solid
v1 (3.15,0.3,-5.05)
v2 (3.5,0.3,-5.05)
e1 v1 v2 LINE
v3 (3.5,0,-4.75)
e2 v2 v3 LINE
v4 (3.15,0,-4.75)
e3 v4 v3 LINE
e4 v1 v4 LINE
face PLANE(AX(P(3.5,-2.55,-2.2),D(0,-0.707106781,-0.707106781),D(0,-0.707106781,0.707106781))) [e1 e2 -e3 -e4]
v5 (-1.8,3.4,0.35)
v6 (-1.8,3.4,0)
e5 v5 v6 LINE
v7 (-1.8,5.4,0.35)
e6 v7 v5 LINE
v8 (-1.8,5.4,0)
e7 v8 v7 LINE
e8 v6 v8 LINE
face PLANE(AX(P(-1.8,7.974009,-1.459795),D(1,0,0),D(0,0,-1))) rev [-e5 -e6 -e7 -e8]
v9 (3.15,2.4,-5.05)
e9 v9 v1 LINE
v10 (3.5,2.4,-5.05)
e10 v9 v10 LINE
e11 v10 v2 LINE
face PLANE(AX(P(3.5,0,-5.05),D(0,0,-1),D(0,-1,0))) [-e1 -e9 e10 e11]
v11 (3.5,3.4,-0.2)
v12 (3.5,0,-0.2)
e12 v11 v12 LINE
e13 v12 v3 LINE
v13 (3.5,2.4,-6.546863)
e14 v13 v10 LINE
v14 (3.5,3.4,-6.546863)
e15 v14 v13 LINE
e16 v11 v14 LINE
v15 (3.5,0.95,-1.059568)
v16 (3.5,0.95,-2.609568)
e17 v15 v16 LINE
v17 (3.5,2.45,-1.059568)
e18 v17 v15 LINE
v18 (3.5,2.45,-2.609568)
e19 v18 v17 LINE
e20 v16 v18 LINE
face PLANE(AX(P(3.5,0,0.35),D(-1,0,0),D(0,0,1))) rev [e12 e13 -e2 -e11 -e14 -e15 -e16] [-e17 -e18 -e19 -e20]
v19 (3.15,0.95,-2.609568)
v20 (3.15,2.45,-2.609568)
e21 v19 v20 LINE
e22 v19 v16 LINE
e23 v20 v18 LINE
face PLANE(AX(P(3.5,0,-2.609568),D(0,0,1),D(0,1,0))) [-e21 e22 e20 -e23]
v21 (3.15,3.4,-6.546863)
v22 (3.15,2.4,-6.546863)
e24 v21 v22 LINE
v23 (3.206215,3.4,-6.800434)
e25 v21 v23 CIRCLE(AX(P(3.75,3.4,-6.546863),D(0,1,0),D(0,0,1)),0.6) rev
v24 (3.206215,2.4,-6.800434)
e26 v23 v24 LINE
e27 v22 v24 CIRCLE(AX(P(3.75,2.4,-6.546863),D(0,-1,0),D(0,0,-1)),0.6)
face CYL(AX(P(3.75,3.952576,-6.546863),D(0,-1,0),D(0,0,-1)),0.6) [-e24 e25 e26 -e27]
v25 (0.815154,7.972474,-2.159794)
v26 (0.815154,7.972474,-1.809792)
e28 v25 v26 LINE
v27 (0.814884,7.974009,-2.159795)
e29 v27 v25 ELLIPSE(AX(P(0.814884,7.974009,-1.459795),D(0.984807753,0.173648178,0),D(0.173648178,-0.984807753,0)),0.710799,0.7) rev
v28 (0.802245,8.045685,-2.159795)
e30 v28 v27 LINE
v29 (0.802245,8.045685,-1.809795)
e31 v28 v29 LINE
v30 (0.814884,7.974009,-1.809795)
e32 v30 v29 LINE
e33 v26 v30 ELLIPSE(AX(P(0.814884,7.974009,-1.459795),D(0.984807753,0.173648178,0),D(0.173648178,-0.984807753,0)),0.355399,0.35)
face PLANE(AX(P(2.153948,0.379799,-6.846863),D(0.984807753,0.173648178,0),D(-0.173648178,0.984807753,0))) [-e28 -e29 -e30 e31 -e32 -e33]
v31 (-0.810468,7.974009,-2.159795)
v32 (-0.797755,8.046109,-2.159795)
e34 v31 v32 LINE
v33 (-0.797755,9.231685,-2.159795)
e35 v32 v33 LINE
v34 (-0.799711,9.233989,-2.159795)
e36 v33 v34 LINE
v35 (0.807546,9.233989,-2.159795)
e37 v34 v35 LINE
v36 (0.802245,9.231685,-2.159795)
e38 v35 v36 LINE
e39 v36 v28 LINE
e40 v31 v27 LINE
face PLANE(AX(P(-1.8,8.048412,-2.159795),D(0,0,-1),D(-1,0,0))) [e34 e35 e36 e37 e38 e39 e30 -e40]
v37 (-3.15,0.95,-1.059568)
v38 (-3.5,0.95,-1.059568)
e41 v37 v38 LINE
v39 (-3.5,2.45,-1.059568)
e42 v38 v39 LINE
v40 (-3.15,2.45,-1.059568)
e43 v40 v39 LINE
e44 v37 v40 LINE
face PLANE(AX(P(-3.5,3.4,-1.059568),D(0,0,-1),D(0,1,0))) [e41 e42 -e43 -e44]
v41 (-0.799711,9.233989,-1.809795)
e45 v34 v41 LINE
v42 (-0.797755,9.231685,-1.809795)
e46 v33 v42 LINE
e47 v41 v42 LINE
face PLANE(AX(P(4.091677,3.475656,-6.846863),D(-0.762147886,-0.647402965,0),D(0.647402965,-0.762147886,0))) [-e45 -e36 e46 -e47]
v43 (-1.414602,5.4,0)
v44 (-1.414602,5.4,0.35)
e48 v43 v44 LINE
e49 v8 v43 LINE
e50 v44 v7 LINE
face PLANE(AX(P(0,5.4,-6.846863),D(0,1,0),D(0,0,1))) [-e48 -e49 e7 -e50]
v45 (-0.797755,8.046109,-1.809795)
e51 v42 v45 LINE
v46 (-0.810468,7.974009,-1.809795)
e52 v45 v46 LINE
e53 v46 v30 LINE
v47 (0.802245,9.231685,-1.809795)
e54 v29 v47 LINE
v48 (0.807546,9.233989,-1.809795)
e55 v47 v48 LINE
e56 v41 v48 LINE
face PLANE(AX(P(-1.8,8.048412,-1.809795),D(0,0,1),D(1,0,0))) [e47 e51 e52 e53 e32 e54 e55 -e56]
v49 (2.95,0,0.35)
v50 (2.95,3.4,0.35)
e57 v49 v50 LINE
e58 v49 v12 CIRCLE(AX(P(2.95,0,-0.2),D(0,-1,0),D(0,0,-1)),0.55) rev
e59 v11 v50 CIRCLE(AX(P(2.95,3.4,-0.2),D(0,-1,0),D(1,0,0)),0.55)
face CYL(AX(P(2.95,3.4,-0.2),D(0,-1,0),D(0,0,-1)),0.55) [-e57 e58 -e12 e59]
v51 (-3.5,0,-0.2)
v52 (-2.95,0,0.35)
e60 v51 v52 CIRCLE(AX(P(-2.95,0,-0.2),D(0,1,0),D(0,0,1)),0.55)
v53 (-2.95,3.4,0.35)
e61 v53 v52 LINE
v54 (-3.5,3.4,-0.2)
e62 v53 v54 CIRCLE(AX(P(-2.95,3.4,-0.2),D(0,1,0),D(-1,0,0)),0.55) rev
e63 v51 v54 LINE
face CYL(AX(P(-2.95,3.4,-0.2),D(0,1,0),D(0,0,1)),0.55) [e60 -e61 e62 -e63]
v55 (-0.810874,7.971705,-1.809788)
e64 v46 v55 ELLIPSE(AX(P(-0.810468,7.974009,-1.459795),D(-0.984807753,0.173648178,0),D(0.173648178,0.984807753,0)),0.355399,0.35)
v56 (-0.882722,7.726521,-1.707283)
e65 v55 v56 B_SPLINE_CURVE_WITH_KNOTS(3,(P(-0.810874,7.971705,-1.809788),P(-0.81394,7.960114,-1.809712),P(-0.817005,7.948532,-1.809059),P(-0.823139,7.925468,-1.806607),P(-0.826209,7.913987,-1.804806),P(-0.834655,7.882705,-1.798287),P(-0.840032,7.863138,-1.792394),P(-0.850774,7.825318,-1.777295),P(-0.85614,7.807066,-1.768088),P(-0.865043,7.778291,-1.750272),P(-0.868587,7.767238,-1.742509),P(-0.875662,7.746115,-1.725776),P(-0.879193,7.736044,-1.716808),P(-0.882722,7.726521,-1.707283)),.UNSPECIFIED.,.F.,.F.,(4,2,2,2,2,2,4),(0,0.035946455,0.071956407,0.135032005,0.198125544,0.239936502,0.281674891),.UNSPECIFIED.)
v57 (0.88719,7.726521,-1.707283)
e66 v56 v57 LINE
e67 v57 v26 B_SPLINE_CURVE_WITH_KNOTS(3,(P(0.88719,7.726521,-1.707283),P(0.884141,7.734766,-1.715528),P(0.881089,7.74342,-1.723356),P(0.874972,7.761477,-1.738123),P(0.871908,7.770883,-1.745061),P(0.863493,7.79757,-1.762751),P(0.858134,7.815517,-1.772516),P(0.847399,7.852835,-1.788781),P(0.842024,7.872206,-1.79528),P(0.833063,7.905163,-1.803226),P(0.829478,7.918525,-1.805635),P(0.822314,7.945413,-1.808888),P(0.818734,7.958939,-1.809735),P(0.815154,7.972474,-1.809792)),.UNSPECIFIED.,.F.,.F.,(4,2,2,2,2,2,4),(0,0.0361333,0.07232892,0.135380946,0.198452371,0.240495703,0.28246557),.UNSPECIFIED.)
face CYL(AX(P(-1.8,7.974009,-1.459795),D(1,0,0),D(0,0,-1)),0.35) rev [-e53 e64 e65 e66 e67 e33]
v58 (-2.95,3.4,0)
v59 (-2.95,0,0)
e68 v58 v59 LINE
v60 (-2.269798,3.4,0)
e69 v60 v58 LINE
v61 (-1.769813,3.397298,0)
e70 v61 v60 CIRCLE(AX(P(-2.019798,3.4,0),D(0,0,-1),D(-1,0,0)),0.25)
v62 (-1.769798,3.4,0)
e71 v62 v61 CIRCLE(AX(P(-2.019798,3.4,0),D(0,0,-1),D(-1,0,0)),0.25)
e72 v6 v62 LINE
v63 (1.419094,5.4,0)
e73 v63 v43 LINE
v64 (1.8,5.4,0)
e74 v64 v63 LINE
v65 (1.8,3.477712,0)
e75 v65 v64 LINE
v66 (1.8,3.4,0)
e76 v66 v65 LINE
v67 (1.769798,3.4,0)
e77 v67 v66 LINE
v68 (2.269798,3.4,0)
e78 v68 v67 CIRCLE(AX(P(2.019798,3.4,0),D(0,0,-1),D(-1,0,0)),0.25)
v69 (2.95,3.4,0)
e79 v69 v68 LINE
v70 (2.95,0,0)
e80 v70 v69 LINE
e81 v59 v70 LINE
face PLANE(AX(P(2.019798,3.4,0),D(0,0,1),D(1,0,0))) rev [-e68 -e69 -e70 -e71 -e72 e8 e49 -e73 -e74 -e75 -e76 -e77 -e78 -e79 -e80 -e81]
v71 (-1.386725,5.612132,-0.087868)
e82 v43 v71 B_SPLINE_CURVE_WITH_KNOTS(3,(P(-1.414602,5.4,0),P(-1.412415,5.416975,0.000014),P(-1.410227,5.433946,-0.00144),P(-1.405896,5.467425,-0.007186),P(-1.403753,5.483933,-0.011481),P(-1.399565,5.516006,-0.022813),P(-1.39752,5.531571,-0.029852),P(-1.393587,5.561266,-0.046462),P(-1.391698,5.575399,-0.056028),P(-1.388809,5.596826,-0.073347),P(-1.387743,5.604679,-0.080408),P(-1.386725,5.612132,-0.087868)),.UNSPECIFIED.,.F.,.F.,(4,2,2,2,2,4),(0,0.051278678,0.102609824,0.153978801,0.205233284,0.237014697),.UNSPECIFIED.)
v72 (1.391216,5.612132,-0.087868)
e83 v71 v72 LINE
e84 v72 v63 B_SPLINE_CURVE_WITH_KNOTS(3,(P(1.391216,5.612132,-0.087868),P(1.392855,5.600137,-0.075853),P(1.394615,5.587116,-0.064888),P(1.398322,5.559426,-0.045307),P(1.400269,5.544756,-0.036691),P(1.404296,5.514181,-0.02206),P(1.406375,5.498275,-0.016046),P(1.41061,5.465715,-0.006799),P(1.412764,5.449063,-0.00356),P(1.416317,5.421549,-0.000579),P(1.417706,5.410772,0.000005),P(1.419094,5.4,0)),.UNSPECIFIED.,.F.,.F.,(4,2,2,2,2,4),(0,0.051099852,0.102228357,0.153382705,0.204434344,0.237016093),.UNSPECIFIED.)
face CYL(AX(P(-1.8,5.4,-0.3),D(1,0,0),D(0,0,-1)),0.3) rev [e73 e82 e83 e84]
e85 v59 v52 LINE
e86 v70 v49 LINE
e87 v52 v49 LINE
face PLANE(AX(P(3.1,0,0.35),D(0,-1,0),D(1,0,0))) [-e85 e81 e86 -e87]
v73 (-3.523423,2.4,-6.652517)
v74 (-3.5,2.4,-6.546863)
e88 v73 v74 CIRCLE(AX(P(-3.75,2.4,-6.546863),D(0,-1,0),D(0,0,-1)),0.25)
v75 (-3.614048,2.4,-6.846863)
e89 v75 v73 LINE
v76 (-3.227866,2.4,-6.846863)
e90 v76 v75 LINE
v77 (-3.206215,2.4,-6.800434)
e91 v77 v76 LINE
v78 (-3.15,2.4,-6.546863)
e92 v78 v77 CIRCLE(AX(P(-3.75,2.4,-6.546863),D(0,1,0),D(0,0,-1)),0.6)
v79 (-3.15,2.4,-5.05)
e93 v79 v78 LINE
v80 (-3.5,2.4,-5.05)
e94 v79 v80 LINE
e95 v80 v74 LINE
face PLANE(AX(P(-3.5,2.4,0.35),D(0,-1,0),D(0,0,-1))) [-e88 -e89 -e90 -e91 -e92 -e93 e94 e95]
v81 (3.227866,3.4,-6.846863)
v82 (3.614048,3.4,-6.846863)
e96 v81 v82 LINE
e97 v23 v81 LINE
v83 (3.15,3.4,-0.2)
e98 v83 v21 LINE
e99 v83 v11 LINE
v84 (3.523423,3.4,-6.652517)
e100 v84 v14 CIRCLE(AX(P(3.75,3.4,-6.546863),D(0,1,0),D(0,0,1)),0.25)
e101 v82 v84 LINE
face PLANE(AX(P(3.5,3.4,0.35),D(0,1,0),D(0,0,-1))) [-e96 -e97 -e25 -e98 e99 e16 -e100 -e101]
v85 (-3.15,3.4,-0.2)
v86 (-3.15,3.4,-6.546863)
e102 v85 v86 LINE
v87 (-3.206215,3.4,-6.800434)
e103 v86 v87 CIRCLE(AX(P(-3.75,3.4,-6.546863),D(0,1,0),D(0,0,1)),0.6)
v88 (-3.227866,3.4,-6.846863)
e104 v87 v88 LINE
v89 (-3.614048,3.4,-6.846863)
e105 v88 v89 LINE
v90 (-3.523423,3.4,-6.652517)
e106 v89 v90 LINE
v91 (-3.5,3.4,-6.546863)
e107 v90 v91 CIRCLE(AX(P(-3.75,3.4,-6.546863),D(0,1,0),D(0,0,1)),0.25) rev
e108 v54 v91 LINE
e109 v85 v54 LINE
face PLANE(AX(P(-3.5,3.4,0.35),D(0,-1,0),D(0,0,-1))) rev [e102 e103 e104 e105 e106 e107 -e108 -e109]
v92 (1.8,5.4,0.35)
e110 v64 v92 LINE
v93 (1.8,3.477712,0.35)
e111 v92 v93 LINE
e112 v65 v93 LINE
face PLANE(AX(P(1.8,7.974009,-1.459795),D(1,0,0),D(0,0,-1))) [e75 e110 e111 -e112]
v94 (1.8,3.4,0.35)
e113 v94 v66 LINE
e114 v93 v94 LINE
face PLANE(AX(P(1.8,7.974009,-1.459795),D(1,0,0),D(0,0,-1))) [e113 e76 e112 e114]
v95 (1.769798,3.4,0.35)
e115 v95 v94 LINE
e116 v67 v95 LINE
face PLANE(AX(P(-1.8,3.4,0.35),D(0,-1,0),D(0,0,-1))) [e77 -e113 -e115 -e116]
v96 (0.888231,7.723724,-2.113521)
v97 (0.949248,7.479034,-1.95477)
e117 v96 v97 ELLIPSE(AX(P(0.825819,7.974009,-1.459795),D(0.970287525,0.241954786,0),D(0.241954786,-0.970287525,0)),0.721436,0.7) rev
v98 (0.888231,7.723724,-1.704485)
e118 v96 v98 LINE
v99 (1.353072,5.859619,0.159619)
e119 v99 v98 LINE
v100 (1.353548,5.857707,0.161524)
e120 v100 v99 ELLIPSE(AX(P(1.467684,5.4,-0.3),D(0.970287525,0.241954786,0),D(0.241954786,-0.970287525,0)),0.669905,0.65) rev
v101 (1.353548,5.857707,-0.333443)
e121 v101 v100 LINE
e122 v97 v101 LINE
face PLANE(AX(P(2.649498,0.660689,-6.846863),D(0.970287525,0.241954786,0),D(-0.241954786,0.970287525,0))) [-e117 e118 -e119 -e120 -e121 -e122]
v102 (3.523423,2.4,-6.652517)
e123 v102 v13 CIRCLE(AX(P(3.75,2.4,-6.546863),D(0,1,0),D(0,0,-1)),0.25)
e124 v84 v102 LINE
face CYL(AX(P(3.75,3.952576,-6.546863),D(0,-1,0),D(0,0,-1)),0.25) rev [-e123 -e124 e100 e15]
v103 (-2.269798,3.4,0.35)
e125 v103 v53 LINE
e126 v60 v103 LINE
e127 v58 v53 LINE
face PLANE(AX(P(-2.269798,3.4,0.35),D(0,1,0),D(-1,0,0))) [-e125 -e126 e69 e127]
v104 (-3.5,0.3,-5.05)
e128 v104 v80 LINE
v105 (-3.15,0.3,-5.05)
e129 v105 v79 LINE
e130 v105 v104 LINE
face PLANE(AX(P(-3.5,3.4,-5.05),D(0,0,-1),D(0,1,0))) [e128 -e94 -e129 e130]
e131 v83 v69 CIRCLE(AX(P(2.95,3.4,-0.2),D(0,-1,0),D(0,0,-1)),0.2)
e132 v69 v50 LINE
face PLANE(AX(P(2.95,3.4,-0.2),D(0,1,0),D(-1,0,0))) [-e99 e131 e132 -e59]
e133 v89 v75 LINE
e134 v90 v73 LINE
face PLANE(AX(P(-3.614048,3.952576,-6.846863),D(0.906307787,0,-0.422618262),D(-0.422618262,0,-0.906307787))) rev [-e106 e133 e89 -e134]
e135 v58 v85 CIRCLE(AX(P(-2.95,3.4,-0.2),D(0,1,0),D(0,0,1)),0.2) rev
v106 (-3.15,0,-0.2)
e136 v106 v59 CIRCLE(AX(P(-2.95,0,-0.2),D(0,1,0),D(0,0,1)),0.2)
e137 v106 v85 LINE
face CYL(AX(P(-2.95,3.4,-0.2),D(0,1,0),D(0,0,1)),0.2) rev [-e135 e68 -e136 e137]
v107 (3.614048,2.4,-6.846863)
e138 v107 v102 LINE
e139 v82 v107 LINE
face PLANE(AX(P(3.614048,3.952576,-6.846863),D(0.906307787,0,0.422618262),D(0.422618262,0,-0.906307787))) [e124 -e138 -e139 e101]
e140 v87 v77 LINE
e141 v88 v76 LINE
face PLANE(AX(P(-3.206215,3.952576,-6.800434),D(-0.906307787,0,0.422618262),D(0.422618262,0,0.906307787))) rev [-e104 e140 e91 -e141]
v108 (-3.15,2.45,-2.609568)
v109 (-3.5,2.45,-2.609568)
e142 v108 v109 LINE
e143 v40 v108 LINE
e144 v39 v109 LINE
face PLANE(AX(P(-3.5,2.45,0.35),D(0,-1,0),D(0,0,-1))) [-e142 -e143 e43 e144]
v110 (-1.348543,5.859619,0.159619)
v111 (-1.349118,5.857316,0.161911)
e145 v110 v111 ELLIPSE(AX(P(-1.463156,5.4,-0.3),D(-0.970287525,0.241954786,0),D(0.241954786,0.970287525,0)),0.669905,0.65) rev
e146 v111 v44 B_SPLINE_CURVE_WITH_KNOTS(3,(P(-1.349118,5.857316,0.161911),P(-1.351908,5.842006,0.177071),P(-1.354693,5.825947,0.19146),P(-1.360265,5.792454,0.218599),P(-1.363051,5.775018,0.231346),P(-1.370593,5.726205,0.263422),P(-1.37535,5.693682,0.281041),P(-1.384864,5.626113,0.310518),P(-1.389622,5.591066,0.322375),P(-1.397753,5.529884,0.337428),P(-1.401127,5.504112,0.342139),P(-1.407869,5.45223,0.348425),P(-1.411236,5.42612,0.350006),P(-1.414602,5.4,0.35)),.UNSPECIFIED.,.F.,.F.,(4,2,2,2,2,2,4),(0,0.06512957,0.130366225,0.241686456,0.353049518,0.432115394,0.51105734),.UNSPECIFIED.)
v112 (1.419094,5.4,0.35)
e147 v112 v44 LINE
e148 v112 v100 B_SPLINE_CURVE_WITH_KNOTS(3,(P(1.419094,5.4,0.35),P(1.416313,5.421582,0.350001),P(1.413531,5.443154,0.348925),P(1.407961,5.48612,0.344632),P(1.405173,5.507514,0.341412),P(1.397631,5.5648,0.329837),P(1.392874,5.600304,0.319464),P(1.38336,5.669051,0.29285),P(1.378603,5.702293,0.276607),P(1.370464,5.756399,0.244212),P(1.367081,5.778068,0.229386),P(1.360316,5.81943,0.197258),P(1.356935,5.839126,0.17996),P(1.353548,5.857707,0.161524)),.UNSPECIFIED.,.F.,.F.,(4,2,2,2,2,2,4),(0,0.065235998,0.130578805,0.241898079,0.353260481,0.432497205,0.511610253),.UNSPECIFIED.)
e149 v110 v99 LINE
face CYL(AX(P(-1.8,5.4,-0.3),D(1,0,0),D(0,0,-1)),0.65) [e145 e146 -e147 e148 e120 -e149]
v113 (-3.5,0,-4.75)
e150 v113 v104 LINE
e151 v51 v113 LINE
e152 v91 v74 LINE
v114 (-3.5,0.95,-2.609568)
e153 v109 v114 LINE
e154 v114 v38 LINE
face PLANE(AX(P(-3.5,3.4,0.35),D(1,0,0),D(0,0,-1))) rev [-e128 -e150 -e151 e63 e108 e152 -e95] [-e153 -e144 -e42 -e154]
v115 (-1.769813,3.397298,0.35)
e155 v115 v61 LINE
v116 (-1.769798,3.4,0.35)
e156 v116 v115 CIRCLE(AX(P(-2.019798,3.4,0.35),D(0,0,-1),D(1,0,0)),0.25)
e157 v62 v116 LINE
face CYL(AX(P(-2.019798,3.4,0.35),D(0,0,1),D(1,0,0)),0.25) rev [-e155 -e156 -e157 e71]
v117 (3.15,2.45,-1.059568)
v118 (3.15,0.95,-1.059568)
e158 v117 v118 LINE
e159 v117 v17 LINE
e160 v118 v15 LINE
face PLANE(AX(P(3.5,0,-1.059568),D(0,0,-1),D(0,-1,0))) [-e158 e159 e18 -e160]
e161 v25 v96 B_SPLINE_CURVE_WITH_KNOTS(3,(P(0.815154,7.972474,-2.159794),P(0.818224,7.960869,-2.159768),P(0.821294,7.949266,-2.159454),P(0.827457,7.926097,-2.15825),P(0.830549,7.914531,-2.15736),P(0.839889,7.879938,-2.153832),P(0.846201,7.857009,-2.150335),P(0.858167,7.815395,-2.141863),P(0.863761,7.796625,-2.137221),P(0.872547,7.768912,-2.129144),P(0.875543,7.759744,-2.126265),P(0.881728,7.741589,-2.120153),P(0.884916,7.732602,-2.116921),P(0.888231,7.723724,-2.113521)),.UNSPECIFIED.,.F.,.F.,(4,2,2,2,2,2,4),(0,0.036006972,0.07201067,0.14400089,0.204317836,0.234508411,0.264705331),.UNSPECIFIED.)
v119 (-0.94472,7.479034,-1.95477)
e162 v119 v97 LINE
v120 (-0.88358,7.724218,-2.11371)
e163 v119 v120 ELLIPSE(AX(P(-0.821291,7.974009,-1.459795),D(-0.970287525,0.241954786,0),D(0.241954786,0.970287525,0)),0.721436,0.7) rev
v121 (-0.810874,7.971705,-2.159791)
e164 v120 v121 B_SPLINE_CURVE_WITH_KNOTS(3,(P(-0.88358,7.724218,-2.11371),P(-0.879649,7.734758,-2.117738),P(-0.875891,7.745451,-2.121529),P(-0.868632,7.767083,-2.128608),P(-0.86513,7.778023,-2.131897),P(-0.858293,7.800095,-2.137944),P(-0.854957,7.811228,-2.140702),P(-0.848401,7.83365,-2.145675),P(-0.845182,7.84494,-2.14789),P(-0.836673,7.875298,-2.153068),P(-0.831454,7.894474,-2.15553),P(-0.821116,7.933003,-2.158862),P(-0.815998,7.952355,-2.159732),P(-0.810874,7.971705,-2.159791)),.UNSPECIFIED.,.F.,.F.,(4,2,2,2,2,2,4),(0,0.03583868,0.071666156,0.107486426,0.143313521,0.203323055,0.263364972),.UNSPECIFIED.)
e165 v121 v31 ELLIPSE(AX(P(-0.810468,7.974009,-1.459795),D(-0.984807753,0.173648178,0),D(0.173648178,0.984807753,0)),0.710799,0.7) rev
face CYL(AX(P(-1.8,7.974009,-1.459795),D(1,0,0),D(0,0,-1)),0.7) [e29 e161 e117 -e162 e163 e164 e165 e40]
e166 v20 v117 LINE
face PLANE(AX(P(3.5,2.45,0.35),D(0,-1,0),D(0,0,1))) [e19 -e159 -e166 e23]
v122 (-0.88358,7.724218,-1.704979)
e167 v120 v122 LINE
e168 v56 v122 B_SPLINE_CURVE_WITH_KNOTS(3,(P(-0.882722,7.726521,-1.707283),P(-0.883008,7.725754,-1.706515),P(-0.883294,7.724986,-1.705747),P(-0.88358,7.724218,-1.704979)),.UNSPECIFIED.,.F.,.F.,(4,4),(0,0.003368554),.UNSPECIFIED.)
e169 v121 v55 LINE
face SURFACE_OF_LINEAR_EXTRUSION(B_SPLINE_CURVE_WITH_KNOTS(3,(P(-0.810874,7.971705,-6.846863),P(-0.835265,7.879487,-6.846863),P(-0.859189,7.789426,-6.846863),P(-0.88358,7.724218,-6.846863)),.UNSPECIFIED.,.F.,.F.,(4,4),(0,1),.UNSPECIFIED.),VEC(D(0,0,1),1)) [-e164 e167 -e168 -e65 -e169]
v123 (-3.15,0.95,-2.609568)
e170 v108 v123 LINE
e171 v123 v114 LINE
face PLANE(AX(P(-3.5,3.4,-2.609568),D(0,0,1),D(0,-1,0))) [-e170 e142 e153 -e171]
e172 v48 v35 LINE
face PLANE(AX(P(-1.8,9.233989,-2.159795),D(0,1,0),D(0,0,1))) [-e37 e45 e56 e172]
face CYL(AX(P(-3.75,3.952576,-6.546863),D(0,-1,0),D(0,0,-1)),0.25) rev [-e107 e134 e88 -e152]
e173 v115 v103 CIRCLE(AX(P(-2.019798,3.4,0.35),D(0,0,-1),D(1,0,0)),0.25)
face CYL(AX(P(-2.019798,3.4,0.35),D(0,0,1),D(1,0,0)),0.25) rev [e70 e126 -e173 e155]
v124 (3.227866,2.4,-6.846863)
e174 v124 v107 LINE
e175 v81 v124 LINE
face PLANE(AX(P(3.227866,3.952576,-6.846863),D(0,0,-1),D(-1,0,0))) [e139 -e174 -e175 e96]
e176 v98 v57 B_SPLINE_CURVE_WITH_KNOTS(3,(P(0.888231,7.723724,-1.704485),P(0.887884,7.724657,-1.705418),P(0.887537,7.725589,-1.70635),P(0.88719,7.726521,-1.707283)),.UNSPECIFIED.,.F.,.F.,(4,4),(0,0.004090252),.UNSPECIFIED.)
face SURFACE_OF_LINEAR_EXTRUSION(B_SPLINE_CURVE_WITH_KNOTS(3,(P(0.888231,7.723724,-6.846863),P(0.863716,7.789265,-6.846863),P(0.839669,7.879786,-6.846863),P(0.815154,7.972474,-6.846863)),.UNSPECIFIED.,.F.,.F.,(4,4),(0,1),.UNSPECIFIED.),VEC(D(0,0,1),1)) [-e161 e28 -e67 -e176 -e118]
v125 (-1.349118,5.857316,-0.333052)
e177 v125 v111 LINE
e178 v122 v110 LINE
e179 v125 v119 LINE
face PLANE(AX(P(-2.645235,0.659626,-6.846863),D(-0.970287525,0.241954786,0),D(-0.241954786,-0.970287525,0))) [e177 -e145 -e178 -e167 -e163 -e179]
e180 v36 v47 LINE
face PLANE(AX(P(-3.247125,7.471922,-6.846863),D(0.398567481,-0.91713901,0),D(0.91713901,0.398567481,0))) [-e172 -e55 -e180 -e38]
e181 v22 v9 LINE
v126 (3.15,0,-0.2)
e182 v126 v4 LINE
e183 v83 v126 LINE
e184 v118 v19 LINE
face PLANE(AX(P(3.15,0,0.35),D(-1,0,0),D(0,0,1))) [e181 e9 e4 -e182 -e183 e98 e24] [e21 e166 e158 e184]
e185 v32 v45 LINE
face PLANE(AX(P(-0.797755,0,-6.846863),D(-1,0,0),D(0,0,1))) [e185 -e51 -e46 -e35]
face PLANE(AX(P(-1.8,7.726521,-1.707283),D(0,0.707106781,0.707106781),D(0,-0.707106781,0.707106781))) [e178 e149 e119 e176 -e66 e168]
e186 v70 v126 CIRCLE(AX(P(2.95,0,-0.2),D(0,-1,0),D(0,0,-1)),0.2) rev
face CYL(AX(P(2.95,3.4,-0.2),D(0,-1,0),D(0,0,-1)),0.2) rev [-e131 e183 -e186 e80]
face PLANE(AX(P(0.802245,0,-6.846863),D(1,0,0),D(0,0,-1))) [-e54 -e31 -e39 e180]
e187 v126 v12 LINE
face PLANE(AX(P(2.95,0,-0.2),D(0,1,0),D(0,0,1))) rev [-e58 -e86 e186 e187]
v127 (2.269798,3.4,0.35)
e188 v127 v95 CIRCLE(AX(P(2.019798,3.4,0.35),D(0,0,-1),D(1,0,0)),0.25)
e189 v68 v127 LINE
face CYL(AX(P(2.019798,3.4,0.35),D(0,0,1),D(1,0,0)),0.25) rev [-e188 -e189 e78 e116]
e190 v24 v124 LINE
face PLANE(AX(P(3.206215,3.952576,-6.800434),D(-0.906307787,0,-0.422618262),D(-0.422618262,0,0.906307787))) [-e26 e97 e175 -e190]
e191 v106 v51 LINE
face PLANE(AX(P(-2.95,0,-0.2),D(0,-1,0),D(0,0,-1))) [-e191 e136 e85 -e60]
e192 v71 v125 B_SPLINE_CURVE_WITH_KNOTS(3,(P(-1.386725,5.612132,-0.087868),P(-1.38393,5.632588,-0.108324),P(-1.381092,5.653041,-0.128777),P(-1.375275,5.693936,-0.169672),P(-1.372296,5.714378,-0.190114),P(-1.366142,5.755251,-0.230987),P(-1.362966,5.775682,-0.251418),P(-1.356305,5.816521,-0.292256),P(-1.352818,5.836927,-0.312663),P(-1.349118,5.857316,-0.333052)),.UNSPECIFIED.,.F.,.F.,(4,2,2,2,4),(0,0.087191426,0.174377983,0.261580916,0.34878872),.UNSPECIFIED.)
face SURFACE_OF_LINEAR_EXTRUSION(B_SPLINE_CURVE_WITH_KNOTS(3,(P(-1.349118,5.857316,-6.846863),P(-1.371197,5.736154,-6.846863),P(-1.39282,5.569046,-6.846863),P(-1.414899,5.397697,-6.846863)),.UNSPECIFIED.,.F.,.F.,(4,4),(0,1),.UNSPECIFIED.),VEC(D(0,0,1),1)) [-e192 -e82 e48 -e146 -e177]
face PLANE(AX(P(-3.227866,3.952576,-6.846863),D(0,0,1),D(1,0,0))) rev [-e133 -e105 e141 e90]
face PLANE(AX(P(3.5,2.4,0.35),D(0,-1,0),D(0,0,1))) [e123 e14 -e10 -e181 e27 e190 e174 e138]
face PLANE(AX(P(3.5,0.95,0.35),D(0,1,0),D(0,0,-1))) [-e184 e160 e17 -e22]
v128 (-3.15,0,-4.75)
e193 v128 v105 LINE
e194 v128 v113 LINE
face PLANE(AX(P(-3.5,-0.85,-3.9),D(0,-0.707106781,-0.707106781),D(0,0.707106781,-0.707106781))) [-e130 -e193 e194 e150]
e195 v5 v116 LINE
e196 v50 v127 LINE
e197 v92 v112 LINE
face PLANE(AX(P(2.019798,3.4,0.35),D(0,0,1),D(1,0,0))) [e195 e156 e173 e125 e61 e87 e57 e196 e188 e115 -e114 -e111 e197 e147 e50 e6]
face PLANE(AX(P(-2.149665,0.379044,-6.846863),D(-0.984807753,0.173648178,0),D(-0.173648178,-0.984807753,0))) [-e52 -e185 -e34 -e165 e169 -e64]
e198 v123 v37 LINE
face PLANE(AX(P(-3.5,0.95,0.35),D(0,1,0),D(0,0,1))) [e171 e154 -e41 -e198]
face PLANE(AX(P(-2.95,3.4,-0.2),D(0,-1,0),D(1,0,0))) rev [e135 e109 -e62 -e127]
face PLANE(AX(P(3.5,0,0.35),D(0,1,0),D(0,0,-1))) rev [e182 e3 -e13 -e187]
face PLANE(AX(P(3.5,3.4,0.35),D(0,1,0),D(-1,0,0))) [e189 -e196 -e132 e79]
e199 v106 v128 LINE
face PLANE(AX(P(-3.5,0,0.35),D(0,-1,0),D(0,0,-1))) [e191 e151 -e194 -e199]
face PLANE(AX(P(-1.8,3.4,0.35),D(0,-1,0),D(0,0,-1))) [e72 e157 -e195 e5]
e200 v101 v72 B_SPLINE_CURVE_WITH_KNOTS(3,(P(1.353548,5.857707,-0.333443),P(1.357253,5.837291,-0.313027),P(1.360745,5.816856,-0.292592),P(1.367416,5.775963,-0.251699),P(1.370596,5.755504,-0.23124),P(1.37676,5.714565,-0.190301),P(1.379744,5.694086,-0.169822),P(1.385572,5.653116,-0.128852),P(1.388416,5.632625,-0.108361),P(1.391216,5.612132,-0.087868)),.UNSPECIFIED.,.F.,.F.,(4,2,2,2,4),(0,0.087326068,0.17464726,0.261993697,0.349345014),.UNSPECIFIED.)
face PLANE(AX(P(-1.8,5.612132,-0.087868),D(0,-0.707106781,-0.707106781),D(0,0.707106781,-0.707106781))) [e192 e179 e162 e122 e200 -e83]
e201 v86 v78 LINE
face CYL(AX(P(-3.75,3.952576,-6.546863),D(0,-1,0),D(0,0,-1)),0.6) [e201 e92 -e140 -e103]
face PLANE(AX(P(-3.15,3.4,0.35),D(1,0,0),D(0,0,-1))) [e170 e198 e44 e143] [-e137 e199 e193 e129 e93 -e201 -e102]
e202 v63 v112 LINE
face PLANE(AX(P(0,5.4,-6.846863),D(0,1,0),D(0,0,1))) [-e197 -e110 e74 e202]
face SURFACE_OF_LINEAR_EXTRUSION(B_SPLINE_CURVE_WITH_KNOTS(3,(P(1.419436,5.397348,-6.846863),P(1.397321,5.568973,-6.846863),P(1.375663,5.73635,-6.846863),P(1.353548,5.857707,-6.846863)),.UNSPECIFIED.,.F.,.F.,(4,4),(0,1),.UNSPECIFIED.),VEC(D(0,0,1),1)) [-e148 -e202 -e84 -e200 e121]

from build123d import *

# Parameters (mm, degrees)
DODANIE_WYCI_GNI_CIE1_DEPTH     = 0.35
DODANIE_WYCI_GNI_CIE2_DEPTH     = 3.4
WYTNIJ_WYCI_GNI_CIE1_DEPTH      = 12.253852902
WYTNIJ_WYCI_GNI_CIE1_DEPTH_BACK = 12.253852902
SZKIC3_W                        = 1.55
SZKIC3_H                        = 1.5
KONWERTUJ_BRY_1_DEPTH           = 3.4
KONWERTUJ_BRY_1_2_DEPTH         = 3.4
DODANIE_WYCI_GNI_CIE3_DEPTH     = 1
DODANIE_WYCI_GNI_CIE4_START     = -1.7
DODANIE_WYCI_GNI_CIE4_DEPTH     = 3.6
WYTNIJ_WYCI_GNI_CIE2_DEPTH      = 13.252457687


# Read off the part's stored shape, not the designer's step: Konwertuj bryłę1
with BuildPart() as part:
    # Szkic1 → Dodanie-wyciągnięcie1 (new body)
    with BuildSketch(Plane.XY):
        with BuildLine():
            Line((3.5, 0), (3.5, 3.4))
            Line((3.5, 3.4), (3.1, 3.4))
            Line((3.1, 3.4), (2.269798394, 3.4))
            ThreePointArc((2.269798394, 3.4), (2.019798394, 3.15), (1.769798394, 3.4))
            Line((1.769798394, 3.4), (1.417144432, 5.4))
            Line((1.417144432, 5.4), (-1.417144432, 5.4))
            Line((-1.417144432, 5.4), (-1.769798394, 3.4))
            ThreePointArc((-1.769798394, 3.4), (-2.019798394, 3.15), (-2.269798394, 3.4))
            Line((-2.269798394, 3.4), (-3.1, 3.4))
            Line((-3.1, 3.4), (-3.5, 3.4))
            Line((-3.5, 3.4), (-3.5, 0))
            Line((-3.5, 0), (-3.1, 0))
            Line((-3.1, 0), (3.1, 0))
            Line((3.1, 0), (3.5, 0))
        make_face()
    extrude(amount=DODANIE_WYCI_GNI_CIE1_DEPTH)

    # Szkic2 → Dodanie-wyciągnięcie2 (add)
    with BuildSketch(Plane.XZ):
        with BuildLine():
            Line((3.15, -5.046862694), (3.15, -6.546862697))
            ThreePointArc((3.15, -6.546862697), (3.164222396, -6.676726465), (3.206215328, -6.800433654))
            Line((3.206215328, -6.800433654), (3.227865546, -6.846862697))
            Line((3.227865546, -6.846862697), (3.614047818, -6.846862697))
            Line((3.614047818, -6.846862697), (3.523423053, -6.652517262))
            ThreePointArc((3.523423053, -6.652517262), (3.505925998, -6.6009726), (3.5, -6.546862697))
            Line((3.5, -6.546862697), (3.5, -5.046862694))
            Line((3.5, -5.046862694), (3.5, -4.746862694))
            Line((3.5, -4.746862694), (3.5, -0.046862697))
            Line((3.5, -0.046862697), (3.5, 0))
            Line((3.5, 0), (3.15, 0))
            Line((3.15, 0), (3.15, -0.046862697))
            Line((3.15, -0.046862697), (3.15, -4.746862694))
            Line((3.15, -4.746862694), (3.15, -5.046862694))
        make_face()
    dodanie_wyci_gni_cie2 = extrude(amount=-DODANIE_WYCI_GNI_CIE2_DEPTH)

    # Lustro1: Dodanie-wyciągnięcie2 across plane
    add(dodanie_wyci_gni_cie2.mirror(Plane(origin=(0, 0, 0), x_dir=(0, 0, 1), z_dir=(1, 0, 0))))

    # Szkic3 → Wytnij-wyciągnięcie1 (cut, two sides: drawn at the far end of the back side and taken through both)
    with BuildSketch(Plane(origin=(3.5, 0, 0), x_dir=(0, 0, -1), z_dir=(1, 0, 0)).offset(-WYTNIJ_WYCI_GNI_CIE1_DEPTH_BACK)):
        with Locations((1.834568124, 1.7)):
            Rectangle(SZKIC3_W, SZKIC3_H)
        Polygon((6.85, 2.4), (6.655654565, 2.4), (6.55, 2.4), (6.546862697, 2.4), (6.546862697, 0), (4.749999997, 0), (4.618517663, -2.046100673), (8.285753876, -1.25448224), align=None)
        Polygon((6.546862697, 0), (6.546862697, 2.4), (5.049999997, 2.4), (5.049999997, 0.3), (4.749999997, 0), align=None)
    extrude(amount=WYTNIJ_WYCI_GNI_CIE1_DEPTH + WYTNIJ_WYCI_GNI_CIE1_DEPTH_BACK, mode=Mode.SUBTRACT)

    # Konwertuj bryłę1 outline → Konwertuj bryłę1 (cut)
    with BuildSketch(Plane(origin=(0, 0, 0), x_dir=(1, 0, 0), z_dir=(0, 1, 0))):
        with BuildLine():
            Line((3.15, 6.546862697), (3.5, 6.546862697))
            ThreePointArc((3.5, 6.546862697), (3.505925998, 6.6009726), (3.523423053, 6.652517262))
            Line((3.523423053, 6.652517262), (3.614047818, 6.846862697))
            Line((3.614047818, 6.846862697), (3.227865546, 6.846862697))
            Line((3.227865546, 6.846862697), (3.206215328, 6.800433654))
            ThreePointArc((3.206215328, 6.800433654), (3.164222396, 6.676726465), (3.15, 6.546862697))
        make_face()
        with BuildLine():
            Line((3.5, -0.35), (3.5, 0.2))
            ThreePointArc((3.5, 0.2), (3.33890873, -0.18890873), (2.95, -0.35))
            Line((2.95, -0.35), (3.5, -0.35))
        make_face()
        with BuildLine():
            Line((-3.5, -0.35), (-2.95, -0.35))
            ThreePointArc((-2.95, -0.35), (-3.33890873, -0.18890873), (-3.5, 0.2))
            Line((-3.5, 0.2), (-3.5, -0.35))
        make_face()
        with BuildLine():
            ThreePointArc((-3.523423053, 6.652517262), (-3.505925998, 6.6009726), (-3.5, 6.546862697))
            Line((-3.5, 6.546862697), (-3.15, 6.546862697))
            ThreePointArc((-3.15, 6.546862697), (-3.164222396, 6.676726465), (-3.206215328, 6.800433654))
            Line((-3.206215328, 6.800433654), (-3.227865546, 6.846862697))
            Line((-3.227865546, 6.846862697), (-3.614047818, 6.846862697))
            Line((-3.614047818, 6.846862697), (-3.523423053, 6.652517262))
        make_face()
    extrude(amount=KONWERTUJ_BRY_1_DEPTH, mode=Mode.SUBTRACT)

    # Konwertuj bry_1 2 outline → Konwertuj bry_1 2 (add)
    with BuildSketch(Plane(origin=(0, 0, 0), x_dir=(1, 0, 0), z_dir=(0, 1, 0))):
        with BuildLine():
            Line((3.15, 0), (3.15, 0.2))
            ThreePointArc((3.15, 0.2), (3.091421356, 0.058578644), (2.95, 0))
            Line((2.95, 0), (3.15, 0))
        make_face()
        with BuildLine():
            Line((-3.15, 0), (-2.95, 0))
            ThreePointArc((-2.95, 0), (-3.091421356, 0.058578644), (-3.15, 0.2))
            Line((-3.15, 0.2), (-3.15, 0))
        make_face()
    extrude(amount=KONWERTUJ_BRY_1_2_DEPTH)

    # Szkic8 → Dodanie-wyciągnięcie3 (add)
    with BuildSketch(Plane.XZ.offset(-2.4)):
        with BuildLine():
            Line((3.206215328, -6.800433654), (3.227865546, -6.846862697))
            Line((3.227865546, -6.846862697), (3.614047818, -6.846862697))
            Line((3.614047818, -6.846862697), (3.523423053, -6.652517262))
            ThreePointArc((3.523423053, -6.652517262), (3.505925998, -6.6009726), (3.5, -6.546862697))
            Line((3.5, -6.546862697), (3.15, -6.546862697))
            ThreePointArc((3.15, -6.546862697), (3.164222396, -6.676726465), (3.206215328, -6.800433654))
        make_face()
    dodanie_wyci_gni_cie3 = extrude(amount=-DODANIE_WYCI_GNI_CIE3_DEPTH)

    # Lustro2: Dodanie-wyciągnięcie3 across plane
    add(dodanie_wyci_gni_cie3.mirror(Plane(origin=(0, 0, 0), x_dir=(0, 0, 1), z_dir=(1, 0, 0))))

    # Szkic9 → Dodanie-wyciągnięcie4 (add)
    with BuildSketch(Plane(origin=(3.5, 0, 0), x_dir=(0, 0, -1), z_dir=(1, 0, 0)).offset(DODANIE_WYCI_GNI_CIE4_START)):
        with BuildLine():
            Line((2.159795211, 8.048412492), (2.159795211, 9.233988579))
            Line((2.159795211, 9.233988579), (1.809795211, 9.233988579))
            Line((1.809795211, 9.233988579), (1.809795211, 8.048412492))
            Line((1.809795211, 8.048412492), (1.809795211, 7.974008773))
            ThreePointArc((1.809795211, 7.974008773), (1.783153047, 7.840069572), (1.707282584, 7.7265214))
            Line((1.707282584, 7.7265214), (-0.159619408, 5.859619408))
            ThreePointArc((-0.159619408, 5.859619408), (-0.300521696, 5.648744231), (-0.35, 5.4))
            Line((-0.35, 5.4), (-0.35, 3.4))
            Line((-0.35, 3.4), (0, 3.4))
            Line((0, 3.4), (0, 5.4))
            ThreePointArc((0, 5.4), (0.02283614, 5.51480503), (0.087867966, 5.612132034))
            Line((0.087867966, 5.612132034), (1.954769957, 7.479034026))
            ThreePointArc((1.954769957, 7.479034026), (2.106510883, 7.70613037), (2.159795211, 7.974008773))
            Line((2.159795211, 7.974008773), (2.159795211, 8.048412492))
        make_face()
    extrude(amount=-DODANIE_WYCI_GNI_CIE4_DEPTH)

    # Szkic10 → Wytnij-wyciągnięcie2 (cut, through all)
    with BuildSketch(Plane.XY.offset(0.35)):
        with BuildLine():
            Line((-1.8, 5.4), (-1.414602313, 5.4))
            add(Edge.make_bspline(
                [(-1.349117856, 5.857315964), (-1.37109798, 5.736696856), (-1.392626241, 5.570542489), (-1.414602313, 5.4)],
                knots=[0, 0, 0, 0, 0.995518499, 0.995518499, 0.995518499, 0.995518499], degree=3))
            Line((-1.349117856, 5.857315964), (-0.883579694, 7.724217956))
            add(Edge.make_bspline(
                [(-0.810874078, 7.971705329), (-0.835264826, 7.87948746), (-0.859188951, 7.789425824), (-0.883579694, 7.724217956)],
                knots=[0, 0, 0, 0, 1, 1, 1, 1], degree=3))
            Line((-0.810874078, 7.971705329), (-0.797754695, 8.04610905))
            Line((-0.797754695, 8.04610905), (-0.797754695, 9.231685135))
            Line((-0.797754695, 9.231685135), (-0.993203543, 9.461775101))
            Line((-0.993203543, 9.461775101), (-2.257838498, 9.461775101))
            Line((-2.257838498, 9.461775101), (-2.100122127, 3.339055662))
            Line((-2.100122127, 3.339055662), (-1.769812995, 3.397298074))
            ThreePointArc((-1.769812995, 3.397298074), (-1.769802044, 3.398649017), (-1.769798394, 3.4))
            Line((-1.769798394, 3.4), (-1.8, 3.4))
            Line((-1.8, 3.4), (-1.8, 5.4))
        make_face()
        with BuildLine():
            Line((1.8, 5.4), (1.8, 3.47771191))
            Line((1.8, 3.47771191), (2.752350462, 6.206517892))
            Line((2.752350462, 6.206517892), (2.752350462, 10.079155902))
            Line((2.752350462, 10.079155902), (0.802245305, 9.231685135))
            Line((0.802245305, 9.231685135), (0.802245305, 8.04568496))
            Line((0.802245305, 8.04568496), (0.815154302, 7.972474402))
            add(Edge.make_bspline(
                [(0.888230882, 7.723724279), (0.863715686, 7.789264869), (0.839669493, 7.879786029), (0.815154302, 7.972474402)],
                knots=[0, 0, 0, 0, 1, 1, 1, 1], degree=3))
            Line((0.888230882, 7.723724279), (1.353548426, 5.857707011))
            add(Edge.make_bspline(
                [(1.419093822, 5.4), (1.3970978, 5.570696055), (1.375549103, 5.736975116), (1.353548426, 5.857707011)],
                knots=[0.005151663, 0.005151663, 0.005151663, 0.005151663, 1, 1, 1, 1], degree=3))
            Line((1.419093822, 5.4), (1.8, 5.4))
        make_face()
    extrude(amount=-WYTNIJ_WYCI_GNI_CIE2_DEPTH, mode=Mode.SUBTRACT)


solid = part.part
